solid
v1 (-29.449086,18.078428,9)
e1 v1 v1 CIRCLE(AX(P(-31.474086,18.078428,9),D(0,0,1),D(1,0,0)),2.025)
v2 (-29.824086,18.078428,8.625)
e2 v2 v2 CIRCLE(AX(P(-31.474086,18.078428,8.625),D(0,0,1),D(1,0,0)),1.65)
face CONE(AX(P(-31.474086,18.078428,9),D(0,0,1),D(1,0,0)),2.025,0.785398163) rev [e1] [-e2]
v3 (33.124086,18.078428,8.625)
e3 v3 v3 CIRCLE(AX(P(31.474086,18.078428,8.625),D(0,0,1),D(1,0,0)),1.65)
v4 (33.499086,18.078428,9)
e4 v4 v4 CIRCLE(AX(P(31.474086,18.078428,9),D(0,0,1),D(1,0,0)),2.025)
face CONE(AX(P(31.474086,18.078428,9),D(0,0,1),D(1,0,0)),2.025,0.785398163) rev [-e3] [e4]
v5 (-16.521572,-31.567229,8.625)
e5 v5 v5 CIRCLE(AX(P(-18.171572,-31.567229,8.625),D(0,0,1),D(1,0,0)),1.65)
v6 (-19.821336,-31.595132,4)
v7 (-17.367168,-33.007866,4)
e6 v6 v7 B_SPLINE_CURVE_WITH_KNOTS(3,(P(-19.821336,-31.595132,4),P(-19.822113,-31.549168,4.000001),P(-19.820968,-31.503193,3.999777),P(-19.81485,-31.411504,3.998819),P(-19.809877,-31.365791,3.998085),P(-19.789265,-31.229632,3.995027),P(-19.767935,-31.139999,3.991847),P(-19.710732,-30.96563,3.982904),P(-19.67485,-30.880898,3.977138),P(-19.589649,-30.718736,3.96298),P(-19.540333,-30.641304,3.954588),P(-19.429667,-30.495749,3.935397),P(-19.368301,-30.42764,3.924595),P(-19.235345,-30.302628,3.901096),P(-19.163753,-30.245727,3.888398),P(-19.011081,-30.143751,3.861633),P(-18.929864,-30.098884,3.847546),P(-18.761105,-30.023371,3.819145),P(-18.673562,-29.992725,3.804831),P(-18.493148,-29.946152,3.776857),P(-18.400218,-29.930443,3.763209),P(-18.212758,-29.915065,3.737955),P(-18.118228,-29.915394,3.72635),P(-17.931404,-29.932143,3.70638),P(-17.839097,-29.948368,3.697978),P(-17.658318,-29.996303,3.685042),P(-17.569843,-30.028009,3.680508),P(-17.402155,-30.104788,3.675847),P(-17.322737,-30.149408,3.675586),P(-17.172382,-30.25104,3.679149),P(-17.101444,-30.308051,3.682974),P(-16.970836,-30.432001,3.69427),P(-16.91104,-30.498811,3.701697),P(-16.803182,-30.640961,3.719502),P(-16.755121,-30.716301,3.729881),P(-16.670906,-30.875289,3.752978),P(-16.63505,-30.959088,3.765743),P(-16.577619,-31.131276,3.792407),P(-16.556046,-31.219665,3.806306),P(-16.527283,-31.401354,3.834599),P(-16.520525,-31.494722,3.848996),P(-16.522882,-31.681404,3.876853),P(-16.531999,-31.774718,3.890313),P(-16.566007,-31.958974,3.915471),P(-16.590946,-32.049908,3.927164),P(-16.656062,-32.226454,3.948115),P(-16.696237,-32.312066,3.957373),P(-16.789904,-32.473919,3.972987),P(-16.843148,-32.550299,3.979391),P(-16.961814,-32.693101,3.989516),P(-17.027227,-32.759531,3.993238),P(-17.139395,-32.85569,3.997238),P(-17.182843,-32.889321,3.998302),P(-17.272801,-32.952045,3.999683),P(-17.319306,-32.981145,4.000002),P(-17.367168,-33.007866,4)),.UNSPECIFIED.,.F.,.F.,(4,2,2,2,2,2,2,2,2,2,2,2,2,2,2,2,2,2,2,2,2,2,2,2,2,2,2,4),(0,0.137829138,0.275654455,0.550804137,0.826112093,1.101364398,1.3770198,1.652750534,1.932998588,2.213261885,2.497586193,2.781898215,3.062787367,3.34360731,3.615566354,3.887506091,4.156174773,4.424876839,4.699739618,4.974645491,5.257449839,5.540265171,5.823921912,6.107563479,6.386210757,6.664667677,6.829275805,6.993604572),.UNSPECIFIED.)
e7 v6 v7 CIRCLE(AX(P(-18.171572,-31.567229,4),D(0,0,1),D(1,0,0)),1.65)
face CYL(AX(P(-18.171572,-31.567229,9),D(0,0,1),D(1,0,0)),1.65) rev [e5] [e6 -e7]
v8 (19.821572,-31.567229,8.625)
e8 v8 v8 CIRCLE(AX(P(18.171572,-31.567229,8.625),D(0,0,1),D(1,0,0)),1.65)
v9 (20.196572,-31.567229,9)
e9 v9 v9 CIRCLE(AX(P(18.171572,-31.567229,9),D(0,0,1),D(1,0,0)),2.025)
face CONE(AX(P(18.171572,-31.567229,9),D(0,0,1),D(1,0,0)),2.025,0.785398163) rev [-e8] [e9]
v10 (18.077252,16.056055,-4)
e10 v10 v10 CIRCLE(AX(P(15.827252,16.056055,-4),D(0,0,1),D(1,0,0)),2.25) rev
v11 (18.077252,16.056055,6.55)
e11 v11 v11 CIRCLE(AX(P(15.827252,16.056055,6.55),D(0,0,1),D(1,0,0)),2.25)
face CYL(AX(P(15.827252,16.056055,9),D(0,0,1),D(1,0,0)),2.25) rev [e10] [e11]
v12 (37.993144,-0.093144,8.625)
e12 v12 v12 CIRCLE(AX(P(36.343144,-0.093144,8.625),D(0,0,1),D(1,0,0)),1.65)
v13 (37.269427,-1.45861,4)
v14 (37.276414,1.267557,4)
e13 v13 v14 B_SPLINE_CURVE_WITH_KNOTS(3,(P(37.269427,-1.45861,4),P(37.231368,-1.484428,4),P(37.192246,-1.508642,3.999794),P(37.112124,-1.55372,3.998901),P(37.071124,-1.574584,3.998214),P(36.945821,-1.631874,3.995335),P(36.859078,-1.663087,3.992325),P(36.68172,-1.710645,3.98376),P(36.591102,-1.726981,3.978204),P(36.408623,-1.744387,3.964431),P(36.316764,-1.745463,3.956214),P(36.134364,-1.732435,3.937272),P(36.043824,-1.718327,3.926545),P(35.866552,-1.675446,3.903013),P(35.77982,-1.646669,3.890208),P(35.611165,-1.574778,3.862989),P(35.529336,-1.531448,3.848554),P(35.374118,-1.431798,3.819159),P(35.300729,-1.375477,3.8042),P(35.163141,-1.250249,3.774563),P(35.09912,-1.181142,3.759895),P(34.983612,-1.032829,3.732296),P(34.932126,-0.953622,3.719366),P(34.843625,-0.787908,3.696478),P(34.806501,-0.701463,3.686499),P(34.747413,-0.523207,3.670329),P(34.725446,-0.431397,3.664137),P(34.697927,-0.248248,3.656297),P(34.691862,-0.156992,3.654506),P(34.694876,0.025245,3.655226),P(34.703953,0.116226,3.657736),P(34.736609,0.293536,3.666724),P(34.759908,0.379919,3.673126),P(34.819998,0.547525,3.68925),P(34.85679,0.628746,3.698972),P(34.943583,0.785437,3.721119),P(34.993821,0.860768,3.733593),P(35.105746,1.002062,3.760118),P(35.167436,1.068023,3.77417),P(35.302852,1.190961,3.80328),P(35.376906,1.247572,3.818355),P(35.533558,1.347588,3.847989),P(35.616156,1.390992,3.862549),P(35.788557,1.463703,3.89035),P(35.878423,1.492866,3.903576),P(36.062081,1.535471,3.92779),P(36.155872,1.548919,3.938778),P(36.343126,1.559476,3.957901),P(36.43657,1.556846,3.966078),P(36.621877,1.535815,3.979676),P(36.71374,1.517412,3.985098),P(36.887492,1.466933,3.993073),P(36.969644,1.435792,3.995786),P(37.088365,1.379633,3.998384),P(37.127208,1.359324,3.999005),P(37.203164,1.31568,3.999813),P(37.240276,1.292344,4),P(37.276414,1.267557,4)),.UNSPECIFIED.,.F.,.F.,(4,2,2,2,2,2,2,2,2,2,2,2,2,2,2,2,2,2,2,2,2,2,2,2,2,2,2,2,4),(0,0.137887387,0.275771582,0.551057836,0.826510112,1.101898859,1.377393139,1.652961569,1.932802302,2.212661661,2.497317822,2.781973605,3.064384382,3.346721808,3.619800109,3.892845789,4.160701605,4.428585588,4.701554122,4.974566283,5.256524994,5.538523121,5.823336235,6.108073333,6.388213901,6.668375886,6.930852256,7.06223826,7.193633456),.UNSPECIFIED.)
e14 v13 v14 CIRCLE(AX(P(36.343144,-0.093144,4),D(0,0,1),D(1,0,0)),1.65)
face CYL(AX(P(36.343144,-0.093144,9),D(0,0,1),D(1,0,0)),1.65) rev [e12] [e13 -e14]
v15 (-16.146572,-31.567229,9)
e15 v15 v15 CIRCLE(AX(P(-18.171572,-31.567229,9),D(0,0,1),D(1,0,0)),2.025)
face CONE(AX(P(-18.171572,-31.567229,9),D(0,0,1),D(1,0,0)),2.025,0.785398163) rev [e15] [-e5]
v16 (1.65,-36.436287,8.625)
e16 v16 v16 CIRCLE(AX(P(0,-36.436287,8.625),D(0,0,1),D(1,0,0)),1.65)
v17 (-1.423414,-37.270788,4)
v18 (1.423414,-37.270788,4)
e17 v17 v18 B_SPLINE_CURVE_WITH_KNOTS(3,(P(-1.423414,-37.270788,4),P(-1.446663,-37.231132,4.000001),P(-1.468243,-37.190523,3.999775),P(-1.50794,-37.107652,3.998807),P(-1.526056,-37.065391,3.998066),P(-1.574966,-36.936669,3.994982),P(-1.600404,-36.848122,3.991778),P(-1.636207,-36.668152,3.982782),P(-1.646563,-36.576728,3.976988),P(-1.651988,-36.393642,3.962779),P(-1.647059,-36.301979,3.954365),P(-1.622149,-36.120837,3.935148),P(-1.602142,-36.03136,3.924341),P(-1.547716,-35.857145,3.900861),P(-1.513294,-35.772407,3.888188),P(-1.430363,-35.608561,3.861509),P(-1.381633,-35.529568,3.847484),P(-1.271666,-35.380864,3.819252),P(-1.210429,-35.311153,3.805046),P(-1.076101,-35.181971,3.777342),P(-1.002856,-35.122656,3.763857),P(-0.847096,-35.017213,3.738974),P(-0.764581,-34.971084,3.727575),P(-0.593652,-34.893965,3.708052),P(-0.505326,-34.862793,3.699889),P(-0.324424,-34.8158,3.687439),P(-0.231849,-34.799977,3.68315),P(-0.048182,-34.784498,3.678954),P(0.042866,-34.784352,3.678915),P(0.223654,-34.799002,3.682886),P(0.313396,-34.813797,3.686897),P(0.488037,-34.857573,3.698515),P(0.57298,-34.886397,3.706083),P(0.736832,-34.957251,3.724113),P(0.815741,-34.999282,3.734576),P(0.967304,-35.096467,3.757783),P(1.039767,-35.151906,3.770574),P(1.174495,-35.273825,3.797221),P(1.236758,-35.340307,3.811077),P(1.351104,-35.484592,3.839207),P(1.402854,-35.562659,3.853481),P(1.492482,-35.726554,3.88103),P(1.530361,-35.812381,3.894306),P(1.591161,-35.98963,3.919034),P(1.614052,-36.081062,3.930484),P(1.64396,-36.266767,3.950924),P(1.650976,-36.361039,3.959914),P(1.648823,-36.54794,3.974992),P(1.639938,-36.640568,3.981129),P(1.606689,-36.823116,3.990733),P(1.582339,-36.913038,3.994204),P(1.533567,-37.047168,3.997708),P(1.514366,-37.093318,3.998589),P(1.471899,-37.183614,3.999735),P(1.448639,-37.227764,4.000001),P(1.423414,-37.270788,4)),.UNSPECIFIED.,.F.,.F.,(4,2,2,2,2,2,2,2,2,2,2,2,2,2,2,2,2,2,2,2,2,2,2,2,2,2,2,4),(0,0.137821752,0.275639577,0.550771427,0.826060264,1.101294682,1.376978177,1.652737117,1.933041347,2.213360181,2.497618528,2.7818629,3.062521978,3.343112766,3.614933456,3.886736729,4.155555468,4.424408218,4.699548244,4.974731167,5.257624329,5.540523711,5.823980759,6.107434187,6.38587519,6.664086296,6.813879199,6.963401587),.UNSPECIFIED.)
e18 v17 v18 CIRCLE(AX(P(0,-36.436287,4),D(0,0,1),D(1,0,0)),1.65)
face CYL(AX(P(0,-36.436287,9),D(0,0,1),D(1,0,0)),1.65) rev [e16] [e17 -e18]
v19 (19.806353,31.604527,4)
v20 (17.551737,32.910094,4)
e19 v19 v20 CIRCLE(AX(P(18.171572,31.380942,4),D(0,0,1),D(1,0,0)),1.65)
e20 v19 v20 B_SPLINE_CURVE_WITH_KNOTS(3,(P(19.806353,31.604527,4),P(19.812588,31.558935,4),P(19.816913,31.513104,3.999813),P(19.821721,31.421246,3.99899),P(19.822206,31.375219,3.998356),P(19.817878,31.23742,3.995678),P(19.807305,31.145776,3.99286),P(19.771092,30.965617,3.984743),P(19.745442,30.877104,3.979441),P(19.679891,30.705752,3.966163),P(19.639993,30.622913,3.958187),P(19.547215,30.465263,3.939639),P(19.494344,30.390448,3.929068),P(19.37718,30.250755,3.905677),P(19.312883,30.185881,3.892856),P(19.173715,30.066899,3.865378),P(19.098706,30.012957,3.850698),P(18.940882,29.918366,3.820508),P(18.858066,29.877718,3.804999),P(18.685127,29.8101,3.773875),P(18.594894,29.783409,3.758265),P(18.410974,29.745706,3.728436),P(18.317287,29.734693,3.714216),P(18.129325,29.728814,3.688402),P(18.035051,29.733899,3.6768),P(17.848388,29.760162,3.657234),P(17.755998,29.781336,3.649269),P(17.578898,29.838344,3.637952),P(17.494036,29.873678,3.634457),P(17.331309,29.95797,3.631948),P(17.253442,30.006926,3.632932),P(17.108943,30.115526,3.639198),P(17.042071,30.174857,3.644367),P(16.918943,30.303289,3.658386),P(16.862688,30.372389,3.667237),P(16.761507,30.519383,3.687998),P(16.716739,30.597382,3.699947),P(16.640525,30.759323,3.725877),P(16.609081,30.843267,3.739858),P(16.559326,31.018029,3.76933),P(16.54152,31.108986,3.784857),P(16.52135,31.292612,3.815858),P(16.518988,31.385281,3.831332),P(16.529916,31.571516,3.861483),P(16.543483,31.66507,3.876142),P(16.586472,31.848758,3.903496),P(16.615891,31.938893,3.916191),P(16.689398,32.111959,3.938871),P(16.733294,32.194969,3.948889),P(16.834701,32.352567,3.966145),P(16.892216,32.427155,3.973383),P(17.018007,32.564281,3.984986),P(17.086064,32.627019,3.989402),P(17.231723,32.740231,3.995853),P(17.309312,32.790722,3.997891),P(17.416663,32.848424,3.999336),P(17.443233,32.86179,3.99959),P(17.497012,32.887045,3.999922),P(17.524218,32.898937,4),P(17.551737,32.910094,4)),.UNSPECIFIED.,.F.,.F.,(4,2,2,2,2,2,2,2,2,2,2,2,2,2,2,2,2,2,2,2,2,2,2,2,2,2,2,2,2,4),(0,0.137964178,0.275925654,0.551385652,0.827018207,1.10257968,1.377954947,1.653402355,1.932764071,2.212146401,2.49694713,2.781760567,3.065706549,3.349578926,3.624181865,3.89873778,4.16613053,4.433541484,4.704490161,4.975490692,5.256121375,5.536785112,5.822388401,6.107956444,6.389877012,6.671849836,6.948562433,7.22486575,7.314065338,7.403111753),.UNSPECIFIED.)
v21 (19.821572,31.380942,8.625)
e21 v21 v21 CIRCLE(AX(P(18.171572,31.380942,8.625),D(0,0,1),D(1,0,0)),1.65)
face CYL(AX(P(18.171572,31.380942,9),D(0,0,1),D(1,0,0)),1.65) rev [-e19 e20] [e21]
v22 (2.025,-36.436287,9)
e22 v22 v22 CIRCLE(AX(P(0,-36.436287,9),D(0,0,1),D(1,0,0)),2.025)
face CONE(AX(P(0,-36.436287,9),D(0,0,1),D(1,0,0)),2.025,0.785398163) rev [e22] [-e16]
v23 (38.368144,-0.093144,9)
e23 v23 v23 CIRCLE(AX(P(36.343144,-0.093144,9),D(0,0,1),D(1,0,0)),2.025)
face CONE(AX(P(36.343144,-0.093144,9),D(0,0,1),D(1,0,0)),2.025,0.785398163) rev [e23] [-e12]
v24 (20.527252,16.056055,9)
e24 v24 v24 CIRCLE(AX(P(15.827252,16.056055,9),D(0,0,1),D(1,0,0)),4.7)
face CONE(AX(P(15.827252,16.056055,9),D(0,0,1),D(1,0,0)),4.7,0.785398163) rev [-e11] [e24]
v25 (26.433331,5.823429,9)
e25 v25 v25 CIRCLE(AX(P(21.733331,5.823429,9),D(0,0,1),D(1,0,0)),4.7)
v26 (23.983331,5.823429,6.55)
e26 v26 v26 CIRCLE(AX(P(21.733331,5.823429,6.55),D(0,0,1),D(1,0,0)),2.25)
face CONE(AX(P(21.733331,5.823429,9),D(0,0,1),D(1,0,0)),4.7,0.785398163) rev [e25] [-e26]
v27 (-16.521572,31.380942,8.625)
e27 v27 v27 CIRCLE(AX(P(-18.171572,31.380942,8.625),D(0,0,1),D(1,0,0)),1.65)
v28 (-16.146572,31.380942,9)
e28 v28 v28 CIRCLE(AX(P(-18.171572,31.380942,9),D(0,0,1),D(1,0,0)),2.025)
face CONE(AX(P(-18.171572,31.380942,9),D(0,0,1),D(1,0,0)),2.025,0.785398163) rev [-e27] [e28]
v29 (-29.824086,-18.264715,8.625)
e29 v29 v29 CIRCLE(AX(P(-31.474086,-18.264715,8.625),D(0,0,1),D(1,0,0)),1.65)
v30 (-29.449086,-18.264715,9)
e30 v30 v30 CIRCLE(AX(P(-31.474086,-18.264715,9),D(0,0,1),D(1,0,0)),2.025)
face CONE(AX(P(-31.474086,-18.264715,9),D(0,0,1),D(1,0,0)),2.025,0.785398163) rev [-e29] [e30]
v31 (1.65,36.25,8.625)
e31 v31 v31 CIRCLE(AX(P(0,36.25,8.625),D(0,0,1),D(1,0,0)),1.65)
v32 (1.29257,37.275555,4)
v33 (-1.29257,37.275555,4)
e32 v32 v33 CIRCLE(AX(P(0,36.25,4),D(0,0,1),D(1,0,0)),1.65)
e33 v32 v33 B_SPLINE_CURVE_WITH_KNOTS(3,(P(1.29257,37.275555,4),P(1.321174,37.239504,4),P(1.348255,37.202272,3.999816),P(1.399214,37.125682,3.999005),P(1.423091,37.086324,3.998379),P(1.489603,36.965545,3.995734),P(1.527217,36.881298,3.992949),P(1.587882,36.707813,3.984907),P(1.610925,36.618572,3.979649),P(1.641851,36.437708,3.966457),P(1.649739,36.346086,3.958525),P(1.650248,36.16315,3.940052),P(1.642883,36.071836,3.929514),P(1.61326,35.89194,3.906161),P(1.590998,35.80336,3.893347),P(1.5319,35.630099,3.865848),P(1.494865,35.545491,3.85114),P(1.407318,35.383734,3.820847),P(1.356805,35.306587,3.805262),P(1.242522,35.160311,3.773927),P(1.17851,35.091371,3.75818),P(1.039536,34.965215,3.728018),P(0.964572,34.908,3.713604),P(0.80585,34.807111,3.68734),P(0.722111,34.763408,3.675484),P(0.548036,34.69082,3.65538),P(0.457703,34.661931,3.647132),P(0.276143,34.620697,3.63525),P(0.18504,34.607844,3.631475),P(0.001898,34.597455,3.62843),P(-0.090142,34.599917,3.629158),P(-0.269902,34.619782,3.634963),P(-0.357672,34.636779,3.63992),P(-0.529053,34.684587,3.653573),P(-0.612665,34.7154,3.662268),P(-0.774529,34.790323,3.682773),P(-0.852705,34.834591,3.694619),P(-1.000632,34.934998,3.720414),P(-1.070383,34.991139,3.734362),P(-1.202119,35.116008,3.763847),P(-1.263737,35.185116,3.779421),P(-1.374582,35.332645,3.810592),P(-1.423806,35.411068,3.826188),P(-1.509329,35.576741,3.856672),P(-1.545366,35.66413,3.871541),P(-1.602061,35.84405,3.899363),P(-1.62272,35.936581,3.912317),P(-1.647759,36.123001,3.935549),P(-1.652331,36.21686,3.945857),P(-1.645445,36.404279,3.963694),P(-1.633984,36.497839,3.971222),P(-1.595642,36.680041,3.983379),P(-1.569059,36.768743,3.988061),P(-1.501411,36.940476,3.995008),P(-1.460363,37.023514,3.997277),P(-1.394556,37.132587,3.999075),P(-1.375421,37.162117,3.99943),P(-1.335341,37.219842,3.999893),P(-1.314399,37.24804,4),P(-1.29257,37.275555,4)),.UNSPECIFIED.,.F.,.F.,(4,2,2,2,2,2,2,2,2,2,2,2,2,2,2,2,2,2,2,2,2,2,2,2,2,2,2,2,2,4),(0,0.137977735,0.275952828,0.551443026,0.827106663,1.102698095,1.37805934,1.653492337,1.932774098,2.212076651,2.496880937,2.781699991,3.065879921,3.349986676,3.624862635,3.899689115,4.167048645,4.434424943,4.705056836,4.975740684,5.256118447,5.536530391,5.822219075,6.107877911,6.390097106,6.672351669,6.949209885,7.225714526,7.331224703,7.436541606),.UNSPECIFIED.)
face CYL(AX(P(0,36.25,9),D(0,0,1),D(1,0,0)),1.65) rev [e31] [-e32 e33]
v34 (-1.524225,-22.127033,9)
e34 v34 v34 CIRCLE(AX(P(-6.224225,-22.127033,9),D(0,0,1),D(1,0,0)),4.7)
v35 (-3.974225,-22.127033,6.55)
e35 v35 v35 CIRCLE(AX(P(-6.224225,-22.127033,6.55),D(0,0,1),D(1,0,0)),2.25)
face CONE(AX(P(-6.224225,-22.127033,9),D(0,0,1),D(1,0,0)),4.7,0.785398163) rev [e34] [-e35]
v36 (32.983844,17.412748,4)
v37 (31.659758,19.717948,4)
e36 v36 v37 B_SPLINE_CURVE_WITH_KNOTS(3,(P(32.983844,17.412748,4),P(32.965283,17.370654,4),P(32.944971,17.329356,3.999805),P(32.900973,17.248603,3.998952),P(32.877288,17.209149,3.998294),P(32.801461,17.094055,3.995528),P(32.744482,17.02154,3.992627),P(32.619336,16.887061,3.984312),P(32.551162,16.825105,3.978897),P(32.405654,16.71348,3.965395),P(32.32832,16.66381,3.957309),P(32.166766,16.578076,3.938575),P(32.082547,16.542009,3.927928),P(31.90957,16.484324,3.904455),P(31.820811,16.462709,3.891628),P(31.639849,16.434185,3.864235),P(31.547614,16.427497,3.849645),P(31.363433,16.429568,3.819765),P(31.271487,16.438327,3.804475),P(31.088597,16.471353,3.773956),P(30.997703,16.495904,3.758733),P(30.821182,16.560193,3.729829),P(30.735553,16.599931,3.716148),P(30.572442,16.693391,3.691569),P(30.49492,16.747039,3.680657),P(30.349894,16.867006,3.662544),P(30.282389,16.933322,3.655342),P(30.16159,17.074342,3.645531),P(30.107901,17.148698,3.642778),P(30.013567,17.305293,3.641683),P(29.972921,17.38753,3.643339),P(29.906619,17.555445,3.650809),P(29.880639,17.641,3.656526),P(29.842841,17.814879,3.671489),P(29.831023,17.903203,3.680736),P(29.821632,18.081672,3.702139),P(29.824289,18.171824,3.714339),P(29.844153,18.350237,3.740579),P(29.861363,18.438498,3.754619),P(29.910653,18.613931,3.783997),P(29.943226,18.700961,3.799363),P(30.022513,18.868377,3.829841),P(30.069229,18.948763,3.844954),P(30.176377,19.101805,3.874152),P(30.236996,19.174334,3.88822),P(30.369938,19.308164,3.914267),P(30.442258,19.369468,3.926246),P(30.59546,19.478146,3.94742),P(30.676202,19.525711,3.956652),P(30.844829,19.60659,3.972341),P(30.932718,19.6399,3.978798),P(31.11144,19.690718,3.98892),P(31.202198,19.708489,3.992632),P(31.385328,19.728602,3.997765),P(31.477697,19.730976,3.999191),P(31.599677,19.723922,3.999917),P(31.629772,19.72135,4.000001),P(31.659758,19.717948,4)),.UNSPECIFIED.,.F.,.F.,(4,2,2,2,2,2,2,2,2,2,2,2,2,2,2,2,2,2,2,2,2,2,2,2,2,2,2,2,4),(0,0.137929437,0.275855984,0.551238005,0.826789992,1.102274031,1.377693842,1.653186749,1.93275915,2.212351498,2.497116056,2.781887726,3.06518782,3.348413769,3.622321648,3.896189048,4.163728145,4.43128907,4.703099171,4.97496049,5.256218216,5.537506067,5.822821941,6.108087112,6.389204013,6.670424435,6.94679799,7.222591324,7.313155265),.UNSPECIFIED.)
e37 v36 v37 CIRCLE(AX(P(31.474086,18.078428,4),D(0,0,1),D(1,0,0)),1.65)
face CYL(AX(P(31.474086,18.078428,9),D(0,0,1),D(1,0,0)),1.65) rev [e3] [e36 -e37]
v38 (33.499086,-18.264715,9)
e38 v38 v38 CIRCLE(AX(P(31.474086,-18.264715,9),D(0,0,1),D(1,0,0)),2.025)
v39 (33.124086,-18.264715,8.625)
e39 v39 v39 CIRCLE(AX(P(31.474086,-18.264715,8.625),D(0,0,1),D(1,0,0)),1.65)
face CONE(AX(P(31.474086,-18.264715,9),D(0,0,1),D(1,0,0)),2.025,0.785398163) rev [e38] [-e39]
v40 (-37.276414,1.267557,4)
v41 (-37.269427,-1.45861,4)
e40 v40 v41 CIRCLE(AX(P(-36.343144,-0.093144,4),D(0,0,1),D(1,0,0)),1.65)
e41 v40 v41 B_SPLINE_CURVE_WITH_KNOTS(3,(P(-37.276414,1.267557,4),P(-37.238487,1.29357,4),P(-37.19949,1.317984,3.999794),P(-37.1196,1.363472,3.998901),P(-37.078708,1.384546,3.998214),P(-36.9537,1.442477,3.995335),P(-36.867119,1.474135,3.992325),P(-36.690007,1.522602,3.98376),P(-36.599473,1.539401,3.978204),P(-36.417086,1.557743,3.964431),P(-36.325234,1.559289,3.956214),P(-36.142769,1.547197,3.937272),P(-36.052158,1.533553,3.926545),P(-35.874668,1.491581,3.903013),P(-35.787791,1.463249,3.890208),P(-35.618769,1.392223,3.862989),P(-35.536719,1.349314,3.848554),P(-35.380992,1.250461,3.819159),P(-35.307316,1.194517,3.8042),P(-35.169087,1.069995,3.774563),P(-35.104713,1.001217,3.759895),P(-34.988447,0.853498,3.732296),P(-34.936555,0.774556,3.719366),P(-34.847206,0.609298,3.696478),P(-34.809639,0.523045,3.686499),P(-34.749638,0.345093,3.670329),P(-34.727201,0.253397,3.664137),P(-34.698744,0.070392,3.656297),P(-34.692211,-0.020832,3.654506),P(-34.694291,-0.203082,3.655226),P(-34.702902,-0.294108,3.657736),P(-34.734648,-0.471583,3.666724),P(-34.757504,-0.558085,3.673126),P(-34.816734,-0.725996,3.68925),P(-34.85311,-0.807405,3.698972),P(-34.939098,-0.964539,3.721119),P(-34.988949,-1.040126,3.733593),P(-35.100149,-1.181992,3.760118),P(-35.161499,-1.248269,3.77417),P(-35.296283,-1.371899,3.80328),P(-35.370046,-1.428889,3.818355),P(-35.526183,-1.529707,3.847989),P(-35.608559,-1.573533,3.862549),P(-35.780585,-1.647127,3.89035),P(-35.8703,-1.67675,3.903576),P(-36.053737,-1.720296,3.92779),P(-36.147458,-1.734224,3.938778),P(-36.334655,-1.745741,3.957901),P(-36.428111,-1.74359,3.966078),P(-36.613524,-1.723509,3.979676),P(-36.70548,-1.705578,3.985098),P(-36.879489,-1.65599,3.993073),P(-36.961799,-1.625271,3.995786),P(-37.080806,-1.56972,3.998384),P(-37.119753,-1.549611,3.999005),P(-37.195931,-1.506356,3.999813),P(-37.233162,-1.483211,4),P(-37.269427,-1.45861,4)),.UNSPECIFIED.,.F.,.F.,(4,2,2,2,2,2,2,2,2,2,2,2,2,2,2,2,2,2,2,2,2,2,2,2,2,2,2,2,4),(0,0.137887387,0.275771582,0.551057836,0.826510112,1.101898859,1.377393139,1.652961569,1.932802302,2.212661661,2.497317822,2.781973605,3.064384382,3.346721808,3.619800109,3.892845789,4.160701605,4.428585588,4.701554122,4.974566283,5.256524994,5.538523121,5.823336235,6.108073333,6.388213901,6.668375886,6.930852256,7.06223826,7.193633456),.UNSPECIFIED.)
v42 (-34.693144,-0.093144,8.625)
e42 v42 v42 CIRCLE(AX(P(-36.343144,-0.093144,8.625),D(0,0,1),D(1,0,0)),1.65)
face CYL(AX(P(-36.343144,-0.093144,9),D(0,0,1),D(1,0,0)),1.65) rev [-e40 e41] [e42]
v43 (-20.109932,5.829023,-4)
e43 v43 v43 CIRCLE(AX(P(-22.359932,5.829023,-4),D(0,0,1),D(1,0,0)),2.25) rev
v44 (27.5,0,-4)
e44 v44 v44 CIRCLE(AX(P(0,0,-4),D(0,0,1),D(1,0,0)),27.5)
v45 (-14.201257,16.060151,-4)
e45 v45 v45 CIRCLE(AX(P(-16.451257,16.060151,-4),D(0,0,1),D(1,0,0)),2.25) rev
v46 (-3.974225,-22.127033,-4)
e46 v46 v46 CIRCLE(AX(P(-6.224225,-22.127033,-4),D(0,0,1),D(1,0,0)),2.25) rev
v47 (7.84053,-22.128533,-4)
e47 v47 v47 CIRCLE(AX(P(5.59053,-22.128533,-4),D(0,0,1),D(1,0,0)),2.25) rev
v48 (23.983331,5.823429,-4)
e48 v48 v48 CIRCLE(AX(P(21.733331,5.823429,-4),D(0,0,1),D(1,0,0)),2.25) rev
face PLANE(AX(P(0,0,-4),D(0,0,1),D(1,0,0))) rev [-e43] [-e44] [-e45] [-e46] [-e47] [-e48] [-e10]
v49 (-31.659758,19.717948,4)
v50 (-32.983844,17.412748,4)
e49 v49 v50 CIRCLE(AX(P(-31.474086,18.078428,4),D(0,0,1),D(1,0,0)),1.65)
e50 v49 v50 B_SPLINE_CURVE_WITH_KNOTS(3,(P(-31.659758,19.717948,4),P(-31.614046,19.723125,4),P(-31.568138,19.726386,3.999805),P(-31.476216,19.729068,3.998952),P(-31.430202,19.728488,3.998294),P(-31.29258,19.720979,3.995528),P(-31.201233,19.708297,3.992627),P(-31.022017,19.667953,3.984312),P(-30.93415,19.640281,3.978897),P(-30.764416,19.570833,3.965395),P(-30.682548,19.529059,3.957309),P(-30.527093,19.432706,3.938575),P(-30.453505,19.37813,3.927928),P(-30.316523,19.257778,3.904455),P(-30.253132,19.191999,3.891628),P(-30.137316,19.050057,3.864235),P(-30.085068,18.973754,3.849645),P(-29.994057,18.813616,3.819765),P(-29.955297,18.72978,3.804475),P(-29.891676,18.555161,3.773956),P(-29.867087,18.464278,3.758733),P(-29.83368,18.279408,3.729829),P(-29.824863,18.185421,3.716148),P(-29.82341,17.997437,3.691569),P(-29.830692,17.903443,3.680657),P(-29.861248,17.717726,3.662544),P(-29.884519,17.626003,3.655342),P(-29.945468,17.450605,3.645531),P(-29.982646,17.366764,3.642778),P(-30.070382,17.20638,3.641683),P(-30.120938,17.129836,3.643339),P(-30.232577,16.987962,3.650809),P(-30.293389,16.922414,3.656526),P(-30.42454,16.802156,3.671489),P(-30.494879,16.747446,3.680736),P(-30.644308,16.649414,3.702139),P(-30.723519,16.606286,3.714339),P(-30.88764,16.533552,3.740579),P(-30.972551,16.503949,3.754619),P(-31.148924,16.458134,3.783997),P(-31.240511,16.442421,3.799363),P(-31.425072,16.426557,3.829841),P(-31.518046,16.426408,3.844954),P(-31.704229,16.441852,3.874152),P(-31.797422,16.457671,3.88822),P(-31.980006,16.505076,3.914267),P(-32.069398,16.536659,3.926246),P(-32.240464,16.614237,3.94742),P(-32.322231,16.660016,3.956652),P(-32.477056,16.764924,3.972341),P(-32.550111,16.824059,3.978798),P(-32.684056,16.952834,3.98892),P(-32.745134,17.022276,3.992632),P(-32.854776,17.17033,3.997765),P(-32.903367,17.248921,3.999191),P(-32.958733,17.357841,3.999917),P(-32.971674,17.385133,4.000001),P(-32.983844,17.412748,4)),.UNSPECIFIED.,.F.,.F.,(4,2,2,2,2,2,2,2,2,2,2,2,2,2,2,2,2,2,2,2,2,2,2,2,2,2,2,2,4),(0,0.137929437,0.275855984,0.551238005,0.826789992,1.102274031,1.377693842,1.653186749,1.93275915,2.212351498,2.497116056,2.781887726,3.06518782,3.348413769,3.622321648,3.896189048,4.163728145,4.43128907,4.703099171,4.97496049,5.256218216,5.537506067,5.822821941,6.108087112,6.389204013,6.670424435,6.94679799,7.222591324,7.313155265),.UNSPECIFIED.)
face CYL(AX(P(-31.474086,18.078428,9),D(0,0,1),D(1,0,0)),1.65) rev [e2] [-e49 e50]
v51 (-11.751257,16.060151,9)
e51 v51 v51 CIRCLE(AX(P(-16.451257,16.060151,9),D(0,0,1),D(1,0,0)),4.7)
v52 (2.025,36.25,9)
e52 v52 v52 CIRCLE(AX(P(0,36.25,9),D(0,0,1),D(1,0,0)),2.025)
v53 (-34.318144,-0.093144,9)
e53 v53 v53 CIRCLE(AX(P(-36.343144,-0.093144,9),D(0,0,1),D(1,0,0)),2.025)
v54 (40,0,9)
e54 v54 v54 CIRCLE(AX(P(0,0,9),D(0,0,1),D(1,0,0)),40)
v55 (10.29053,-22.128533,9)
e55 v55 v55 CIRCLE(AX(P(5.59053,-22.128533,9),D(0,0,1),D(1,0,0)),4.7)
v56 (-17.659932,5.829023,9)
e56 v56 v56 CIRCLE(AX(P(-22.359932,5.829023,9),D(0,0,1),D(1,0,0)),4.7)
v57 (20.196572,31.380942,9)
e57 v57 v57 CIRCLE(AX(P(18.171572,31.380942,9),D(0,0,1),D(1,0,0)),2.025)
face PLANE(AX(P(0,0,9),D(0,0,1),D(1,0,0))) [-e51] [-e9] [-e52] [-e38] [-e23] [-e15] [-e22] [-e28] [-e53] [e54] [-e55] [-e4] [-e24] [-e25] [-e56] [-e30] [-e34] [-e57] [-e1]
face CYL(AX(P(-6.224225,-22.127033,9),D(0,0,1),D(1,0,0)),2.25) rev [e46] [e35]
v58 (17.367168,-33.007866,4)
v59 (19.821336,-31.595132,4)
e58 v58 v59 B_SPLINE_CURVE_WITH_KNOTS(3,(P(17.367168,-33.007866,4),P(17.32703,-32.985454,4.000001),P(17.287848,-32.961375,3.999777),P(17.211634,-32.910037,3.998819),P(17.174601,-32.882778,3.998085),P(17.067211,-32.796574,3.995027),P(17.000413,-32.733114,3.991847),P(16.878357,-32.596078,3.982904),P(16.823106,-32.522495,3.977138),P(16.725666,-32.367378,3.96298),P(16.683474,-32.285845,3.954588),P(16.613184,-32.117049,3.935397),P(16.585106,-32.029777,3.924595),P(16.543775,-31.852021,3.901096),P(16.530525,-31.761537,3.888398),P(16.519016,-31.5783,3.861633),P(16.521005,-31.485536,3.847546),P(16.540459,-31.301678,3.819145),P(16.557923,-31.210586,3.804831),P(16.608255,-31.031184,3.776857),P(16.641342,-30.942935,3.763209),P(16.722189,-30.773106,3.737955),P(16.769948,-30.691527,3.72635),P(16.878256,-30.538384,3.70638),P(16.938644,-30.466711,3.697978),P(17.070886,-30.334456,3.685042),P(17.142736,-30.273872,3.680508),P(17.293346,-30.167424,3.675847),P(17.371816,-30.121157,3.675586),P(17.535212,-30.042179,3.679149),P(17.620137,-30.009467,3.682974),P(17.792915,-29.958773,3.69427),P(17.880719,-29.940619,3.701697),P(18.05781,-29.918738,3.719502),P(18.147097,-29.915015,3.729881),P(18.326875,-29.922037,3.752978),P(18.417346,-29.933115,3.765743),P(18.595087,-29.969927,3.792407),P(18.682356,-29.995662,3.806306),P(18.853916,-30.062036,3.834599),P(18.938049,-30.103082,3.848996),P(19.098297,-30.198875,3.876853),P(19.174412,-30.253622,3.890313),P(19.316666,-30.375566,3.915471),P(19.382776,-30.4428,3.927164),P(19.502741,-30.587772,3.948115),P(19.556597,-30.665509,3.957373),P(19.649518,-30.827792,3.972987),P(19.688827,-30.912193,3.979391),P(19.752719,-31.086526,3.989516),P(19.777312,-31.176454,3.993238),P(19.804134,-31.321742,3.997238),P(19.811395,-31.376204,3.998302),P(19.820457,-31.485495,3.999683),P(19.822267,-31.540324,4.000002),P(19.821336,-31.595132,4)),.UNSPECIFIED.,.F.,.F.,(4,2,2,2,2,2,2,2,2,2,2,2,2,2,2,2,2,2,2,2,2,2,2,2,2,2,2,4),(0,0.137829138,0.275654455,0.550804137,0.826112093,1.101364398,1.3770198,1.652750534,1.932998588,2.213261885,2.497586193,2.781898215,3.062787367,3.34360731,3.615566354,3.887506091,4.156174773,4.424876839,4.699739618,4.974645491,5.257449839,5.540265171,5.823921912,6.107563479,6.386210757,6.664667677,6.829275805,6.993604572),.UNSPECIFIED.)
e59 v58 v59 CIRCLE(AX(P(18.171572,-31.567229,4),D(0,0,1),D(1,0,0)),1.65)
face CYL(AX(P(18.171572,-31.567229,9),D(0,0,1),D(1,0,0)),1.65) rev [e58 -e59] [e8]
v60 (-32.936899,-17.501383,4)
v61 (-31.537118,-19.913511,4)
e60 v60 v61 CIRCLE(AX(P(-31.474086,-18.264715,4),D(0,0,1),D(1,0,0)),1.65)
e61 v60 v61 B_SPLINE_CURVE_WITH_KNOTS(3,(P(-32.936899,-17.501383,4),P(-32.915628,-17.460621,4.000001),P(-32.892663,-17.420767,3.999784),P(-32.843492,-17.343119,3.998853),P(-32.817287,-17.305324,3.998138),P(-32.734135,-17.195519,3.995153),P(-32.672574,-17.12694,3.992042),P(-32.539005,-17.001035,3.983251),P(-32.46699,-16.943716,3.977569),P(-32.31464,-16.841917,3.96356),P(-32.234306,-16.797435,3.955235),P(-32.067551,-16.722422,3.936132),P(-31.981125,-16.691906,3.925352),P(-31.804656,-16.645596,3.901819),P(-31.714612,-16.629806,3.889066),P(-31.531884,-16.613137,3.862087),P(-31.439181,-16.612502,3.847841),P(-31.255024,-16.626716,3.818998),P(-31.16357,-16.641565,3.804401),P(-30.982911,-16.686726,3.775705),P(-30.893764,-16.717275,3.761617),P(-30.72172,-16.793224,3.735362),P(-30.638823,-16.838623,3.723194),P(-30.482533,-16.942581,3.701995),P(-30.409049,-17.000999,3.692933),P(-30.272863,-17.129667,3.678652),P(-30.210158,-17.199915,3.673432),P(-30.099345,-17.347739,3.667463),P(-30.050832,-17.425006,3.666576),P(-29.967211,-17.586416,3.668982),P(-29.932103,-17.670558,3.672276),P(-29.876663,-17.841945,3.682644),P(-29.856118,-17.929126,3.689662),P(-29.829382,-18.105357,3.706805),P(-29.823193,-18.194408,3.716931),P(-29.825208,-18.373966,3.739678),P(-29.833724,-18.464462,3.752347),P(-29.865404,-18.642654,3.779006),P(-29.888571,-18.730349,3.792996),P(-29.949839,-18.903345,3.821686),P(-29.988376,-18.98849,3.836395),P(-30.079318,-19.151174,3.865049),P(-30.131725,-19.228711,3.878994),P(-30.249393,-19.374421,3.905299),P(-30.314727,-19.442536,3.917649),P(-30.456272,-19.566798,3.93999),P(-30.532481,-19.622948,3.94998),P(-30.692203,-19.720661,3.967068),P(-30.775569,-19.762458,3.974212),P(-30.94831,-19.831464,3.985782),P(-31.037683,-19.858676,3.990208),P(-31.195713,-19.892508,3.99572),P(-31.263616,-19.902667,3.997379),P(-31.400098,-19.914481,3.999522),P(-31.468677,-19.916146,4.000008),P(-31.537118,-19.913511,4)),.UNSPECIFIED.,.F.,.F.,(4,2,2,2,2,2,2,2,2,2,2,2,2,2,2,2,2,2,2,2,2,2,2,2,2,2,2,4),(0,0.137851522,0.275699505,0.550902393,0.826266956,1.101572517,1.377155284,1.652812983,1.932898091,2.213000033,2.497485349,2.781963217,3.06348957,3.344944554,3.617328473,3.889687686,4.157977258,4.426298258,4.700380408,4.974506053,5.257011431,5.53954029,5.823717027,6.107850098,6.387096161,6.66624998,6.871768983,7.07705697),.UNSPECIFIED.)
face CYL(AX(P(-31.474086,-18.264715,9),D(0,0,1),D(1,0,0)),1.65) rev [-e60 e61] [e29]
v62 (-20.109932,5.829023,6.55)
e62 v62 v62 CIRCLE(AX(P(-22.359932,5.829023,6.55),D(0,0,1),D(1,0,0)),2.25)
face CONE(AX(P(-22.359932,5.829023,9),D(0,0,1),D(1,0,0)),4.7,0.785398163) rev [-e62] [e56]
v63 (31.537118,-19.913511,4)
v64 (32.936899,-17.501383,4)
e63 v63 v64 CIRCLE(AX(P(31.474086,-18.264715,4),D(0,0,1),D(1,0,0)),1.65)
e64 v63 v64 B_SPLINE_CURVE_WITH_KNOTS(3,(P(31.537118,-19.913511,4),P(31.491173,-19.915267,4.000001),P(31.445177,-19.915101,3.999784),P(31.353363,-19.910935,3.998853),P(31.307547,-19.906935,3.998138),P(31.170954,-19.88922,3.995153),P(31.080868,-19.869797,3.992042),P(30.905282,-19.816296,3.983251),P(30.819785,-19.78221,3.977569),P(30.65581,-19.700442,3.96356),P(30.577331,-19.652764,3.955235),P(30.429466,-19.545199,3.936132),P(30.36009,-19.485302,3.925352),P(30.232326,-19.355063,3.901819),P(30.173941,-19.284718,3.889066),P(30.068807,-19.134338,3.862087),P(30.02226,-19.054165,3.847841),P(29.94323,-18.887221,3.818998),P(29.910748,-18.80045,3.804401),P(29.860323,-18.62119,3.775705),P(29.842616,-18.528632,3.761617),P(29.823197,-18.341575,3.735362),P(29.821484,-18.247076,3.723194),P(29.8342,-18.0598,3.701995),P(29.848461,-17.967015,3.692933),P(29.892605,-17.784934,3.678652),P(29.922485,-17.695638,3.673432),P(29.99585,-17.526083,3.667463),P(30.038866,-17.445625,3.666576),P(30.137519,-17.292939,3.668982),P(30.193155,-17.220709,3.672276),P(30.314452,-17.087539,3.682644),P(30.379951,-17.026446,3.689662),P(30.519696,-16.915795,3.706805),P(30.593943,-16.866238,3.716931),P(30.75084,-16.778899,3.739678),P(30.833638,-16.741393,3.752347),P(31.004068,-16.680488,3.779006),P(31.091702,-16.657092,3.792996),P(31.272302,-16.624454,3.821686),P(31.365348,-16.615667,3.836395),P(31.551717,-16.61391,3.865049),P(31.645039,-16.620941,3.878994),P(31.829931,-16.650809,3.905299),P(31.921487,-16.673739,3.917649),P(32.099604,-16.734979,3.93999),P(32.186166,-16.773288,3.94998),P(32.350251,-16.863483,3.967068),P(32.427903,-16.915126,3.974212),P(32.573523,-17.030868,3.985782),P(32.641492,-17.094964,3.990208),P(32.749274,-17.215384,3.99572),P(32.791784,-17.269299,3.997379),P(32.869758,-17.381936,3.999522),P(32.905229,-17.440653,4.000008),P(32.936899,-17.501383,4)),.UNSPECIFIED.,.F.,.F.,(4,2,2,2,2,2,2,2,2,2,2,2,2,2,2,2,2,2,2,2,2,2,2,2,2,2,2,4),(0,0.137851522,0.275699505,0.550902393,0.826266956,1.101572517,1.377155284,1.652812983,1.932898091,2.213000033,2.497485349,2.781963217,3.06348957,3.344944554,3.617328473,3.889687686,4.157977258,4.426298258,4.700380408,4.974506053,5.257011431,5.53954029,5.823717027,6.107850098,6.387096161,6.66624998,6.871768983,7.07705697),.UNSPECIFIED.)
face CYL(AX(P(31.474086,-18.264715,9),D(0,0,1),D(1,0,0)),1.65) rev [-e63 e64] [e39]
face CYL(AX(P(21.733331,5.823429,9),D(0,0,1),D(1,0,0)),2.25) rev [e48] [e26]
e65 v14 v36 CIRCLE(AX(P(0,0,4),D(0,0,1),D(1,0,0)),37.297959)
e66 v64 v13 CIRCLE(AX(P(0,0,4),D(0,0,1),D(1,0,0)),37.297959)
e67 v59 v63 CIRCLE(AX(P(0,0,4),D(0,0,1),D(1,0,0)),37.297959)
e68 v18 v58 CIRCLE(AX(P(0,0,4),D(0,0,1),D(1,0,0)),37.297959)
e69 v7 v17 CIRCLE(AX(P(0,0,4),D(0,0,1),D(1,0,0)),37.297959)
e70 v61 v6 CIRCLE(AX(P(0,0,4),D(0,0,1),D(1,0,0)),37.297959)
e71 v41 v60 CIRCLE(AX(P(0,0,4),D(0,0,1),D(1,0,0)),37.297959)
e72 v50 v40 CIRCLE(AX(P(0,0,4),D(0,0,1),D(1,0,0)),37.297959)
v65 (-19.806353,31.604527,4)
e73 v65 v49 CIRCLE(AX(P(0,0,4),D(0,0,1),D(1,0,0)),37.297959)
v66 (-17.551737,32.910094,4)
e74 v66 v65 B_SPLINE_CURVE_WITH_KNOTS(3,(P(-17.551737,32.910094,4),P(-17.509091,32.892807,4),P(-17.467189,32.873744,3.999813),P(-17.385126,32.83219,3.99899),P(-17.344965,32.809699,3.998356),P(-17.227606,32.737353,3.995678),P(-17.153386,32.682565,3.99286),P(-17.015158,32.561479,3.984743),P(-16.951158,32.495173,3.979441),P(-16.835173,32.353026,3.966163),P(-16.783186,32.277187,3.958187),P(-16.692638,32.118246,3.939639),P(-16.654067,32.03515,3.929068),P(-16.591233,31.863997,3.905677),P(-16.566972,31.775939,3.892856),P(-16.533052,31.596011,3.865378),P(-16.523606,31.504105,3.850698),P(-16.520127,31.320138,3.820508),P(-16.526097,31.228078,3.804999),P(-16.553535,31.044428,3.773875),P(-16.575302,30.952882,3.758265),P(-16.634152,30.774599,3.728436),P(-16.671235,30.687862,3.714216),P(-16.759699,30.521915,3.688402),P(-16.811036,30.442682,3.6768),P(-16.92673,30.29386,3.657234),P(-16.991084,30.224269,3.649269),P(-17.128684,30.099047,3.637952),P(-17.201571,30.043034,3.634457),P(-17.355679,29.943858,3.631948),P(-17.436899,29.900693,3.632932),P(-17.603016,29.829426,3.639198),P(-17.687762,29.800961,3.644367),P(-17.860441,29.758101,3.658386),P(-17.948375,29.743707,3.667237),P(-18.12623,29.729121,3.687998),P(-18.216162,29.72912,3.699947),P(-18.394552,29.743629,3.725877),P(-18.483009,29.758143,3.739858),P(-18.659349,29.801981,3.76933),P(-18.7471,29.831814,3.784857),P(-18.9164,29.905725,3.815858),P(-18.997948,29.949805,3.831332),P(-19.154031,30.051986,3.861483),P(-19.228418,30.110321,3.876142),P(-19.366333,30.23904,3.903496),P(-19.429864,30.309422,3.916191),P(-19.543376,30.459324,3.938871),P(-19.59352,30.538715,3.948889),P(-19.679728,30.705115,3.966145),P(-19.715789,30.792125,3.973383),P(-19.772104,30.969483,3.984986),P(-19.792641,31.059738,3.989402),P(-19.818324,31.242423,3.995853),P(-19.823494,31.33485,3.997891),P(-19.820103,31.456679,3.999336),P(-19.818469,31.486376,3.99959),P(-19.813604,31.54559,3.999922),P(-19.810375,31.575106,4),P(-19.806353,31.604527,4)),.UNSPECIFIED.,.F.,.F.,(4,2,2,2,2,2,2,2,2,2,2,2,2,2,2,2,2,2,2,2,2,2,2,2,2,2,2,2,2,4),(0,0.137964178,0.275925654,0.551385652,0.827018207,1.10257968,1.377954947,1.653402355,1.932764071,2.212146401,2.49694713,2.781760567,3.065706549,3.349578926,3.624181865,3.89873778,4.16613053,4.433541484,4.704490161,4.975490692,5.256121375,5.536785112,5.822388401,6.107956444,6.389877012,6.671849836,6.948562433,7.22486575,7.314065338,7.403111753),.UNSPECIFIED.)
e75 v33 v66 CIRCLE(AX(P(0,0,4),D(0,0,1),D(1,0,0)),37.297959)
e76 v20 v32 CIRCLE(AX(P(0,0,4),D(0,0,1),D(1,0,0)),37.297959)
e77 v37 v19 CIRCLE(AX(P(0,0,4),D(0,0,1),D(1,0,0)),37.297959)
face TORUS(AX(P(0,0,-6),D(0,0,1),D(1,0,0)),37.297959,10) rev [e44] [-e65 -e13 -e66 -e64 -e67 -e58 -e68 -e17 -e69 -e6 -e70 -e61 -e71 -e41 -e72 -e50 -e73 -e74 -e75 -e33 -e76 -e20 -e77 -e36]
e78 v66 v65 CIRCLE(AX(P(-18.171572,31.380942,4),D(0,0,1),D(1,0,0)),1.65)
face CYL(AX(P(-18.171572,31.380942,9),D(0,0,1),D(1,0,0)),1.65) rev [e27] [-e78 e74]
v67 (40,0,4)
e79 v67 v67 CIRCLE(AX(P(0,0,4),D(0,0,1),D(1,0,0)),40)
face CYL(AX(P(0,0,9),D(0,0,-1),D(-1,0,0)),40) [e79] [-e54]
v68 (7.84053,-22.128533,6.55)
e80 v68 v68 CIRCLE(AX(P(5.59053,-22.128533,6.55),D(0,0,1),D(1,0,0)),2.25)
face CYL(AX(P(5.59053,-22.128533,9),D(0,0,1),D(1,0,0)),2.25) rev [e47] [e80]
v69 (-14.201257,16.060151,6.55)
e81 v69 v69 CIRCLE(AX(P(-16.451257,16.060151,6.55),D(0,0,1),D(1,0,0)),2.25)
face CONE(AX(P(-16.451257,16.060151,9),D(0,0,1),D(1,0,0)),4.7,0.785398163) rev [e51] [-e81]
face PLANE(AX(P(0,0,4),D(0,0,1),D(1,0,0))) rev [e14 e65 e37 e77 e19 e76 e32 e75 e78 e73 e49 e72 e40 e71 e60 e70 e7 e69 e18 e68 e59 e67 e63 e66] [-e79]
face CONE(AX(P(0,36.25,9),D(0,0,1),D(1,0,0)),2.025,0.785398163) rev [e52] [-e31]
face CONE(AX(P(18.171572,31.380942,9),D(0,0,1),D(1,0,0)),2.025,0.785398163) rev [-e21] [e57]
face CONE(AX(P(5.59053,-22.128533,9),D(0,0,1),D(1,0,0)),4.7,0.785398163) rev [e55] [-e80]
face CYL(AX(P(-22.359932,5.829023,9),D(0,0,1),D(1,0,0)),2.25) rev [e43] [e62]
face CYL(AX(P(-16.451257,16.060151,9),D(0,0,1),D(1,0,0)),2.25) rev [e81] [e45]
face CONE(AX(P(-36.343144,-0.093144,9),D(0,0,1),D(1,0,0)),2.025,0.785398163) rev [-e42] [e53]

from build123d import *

# Parameters (mm, degrees)
SKETCH1_R                                       = 27.5
BOSS_EXTRUDE1_DEPTH                             = 4
SKETCH2_R                                       = 40
BOSS_EXTRUDE2_DEPTH                             = 5
CIRPATTERN1_COUNT                               = 12
CSK_FOR_M4_FLAT_HEAD_MACHINE_SCREW2_D           = 4.5
CSK_FOR_M4_FLAT_HEAD_MACHINE_SCREW2_CSINK_D     = 9.4
CSK_FOR_M4_FLAT_HEAD_MACHINE_SCREW2_CSINK_ANGLE = 90
CIRPATTERN3_COUNT                               = 12
FILLET2_R                                       = 10


with BuildPart() as part:
    # Sketch1 → Boss-Extrude1 (new, symmetric)
    with BuildSketch(Plane.XY):
        Circle(SKETCH1_R)
    extrude(amount=BOSS_EXTRUDE1_DEPTH, both=True)

    # Sketch2 → Boss-Extrude2 (add)
    with BuildSketch(Plane.XY.offset(4)):
        Circle(SKETCH2_R)
    extrude(amount=BOSS_EXTRUDE2_DEPTH)

    # Sketch5 → M4x0.7 Tapped Hole1 (revolve, cut)
    with BuildSketch(Plane(origin=(0, 36.25, 9), x_dir=(0, -1, 0), z_dir=(1, 0, 0))):
        Polygon((0, 0), (0, 11.091420021), (1.65, 10.1), (1.65, 0.375), (2.025, 0), align=None)
    m4x0_7_tapped_hole1 = revolve(axis=Axis((0, 36.25, 15.35), (0, 0, -1)), mode=Mode.SUBTRACT)

    # CirPattern1: M4x0.7 Tapped Hole1 ×12 about axis
    cirpattern1_axis = Axis((0, -0.093143502, 0), (0, 0, 1))
    for i in range(1, CIRPATTERN1_COUNT):
        add(m4x0_7_tapped_hole1.rotate(cirpattern1_axis, i * 360 / CIRPATTERN1_COUNT), mode=Mode.SUBTRACT)

    # CSK for M4 Flat Head Machine Screw2 (through all)
    with Locations(Plane.XY.offset(9)):
        with Locations((21.733331092, 5.823428515)):
            csk_for_m4_flat_head_machine_screw2 = CounterSinkHole(CSK_FOR_M4_FLAT_HEAD_MACHINE_SCREW2_D / 2, CSK_FOR_M4_FLAT_HEAD_MACHINE_SCREW2_CSINK_D / 2, counter_sink_angle=CSK_FOR_M4_FLAT_HEAD_MACHINE_SCREW2_CSINK_ANGLE)

    # CirPattern3: CSK for M4 Flat Head Machine Screw2 ×12 about axis, 6 skipped
    cirpattern3_axis = Axis((-0.314050172, -0.081151288, 0), (0, 0, 1))
    add([csk_for_m4_flat_head_machine_screw2.rotate(cirpattern3_axis, i * 360 / CIRPATTERN3_COUNT) for i in range(1, CIRPATTERN3_COUNT) if i not in (2, 3, 6, 7, 10, 11)], mode=Mode.SUBTRACT)

    # Fillet2
    # the kernel refuses this fillet: 10 mm, written as the material it adds along each edge
    with BuildSketch(Plane(origin=(0, 0, 4), x_dir=(1, 0, 0), z_dir=(0, -1, 0))) as fillet2_piece_1_section:
        with BuildLine():
            CenterArc((37.297958971, -10), FILLET2_R, 90, 78.463040967)
            Line((37.297958971, 0), (37.297958971, 0.2))
            Line((37.297958971, 0.2), (27.5, 0.2))
            Line((27.5, 0.2), (27.3, 0))
            ThreePointArc((27.3, 0), (27.3, -4), (27.304040821, -7.96))
            Line((27.304040821, -7.96), (27.5, -8))
        make_face()
    fillet2_piece_1 = revolve(axis=Axis((0, 0, 4), (0, 0, 1)), mode=Mode.PRIVATE)
    fillet2_piece_1 = fillet2_piece_1 - Plane(origin=(18.171571751, 31.380942024, 1.87223315), x_dir=(-0.5000000000000004, -0.8660254037844384, 0), z_dir=(0, 0, 1)) * Cylinder(1.65, 150, mode=Mode.PRIVATE)
    fillet2_piece_1 = fillet2_piece_1 - Plane(origin=(31.474085526, 18.078428249, 1.87223315), x_dir=(-0.8660254037844386, -0.5000000000000001, 0), z_dir=(0, 0, 1)) * Cylinder(1.65, 150, mode=Mode.PRIVATE)
    fillet2_piece_1 = fillet2_piece_1 - Plane(origin=(36.343143502, -0.093143502, 1.87223315), x_dir=(-1, 0, 0), z_dir=(0, 0, 1)) * Cylinder(1.65, 150, mode=Mode.PRIVATE)
    fillet2_piece_1 = fillet2_piece_1 - Plane(origin=(0, 36.25, 1.87223315), x_dir=(0, -1, 0), z_dir=(0, 0, 1)) * Cylinder(1.65, 150, mode=Mode.PRIVATE)
    fillet2_piece_1 = fillet2_piece_1 - Plane(origin=(-18.171571751, 31.380942024, 1.87223315), x_dir=(0.49999999999999994, -0.8660254037844387, 0), z_dir=(0, 0, 1)) * Cylinder(1.65, 150, mode=Mode.PRIVATE)
    fillet2_piece_1 = fillet2_piece_1 - Plane(origin=(-31.474085526, 18.078428249, 1.87223315), x_dir=(0.8660254037844386, -0.5000000000000001, 0), z_dir=(0, 0, 1)) * Cylinder(1.65, 150, mode=Mode.PRIVATE)
    fillet2_piece_1 = fillet2_piece_1 - Plane(origin=(31.474085526, -18.264715253, 1.87223315), x_dir=(-0.8660254037844384, 0.5000000000000004, 0), z_dir=(0, 0, 1)) * Cylinder(1.65, 150, mode=Mode.PRIVATE)
    fillet2_piece_1 = fillet2_piece_1 - Plane(origin=(18.171571751, -31.567229028, 1.87223315), x_dir=(-0.5000000000000001, 0.8660254037844386, 0), z_dir=(0, 0, 1)) * Cylinder(1.65, 150, mode=Mode.PRIVATE)
    fillet2_piece_1 = fillet2_piece_1 - Plane(origin=(0, -36.436287004, 1.87223315), x_dir=(0, 1, 0), z_dir=(0, 0, 1)) * Cylinder(1.65, 150, mode=Mode.PRIVATE)
    fillet2_piece_1 = fillet2_piece_1 - Plane(origin=(-36.343143502, -0.093143502, 1.87223315), x_dir=(1, 0, 0), z_dir=(0, 0, 1)) * Cylinder(1.65, 150, mode=Mode.PRIVATE)
    fillet2_piece_1 = fillet2_piece_1 - Plane(origin=(-31.474085526, -18.264715253, 1.87223315), x_dir=(0.8660254037844388, 0.49999999999999983, 0), z_dir=(0, 0, 1)) * Cylinder(1.65, 150, mode=Mode.PRIVATE)
    fillet2_piece_1 = fillet2_piece_1 - Plane(origin=(-18.171571751, -31.567229028, 1.87223315), x_dir=(0.49999999999999994, 0.8660254037844388, 0), z_dir=(0, 0, 1)) * Cylinder(1.65, 150, mode=Mode.PRIVATE)
    add(fillet2_piece_1)


solid = part.part
